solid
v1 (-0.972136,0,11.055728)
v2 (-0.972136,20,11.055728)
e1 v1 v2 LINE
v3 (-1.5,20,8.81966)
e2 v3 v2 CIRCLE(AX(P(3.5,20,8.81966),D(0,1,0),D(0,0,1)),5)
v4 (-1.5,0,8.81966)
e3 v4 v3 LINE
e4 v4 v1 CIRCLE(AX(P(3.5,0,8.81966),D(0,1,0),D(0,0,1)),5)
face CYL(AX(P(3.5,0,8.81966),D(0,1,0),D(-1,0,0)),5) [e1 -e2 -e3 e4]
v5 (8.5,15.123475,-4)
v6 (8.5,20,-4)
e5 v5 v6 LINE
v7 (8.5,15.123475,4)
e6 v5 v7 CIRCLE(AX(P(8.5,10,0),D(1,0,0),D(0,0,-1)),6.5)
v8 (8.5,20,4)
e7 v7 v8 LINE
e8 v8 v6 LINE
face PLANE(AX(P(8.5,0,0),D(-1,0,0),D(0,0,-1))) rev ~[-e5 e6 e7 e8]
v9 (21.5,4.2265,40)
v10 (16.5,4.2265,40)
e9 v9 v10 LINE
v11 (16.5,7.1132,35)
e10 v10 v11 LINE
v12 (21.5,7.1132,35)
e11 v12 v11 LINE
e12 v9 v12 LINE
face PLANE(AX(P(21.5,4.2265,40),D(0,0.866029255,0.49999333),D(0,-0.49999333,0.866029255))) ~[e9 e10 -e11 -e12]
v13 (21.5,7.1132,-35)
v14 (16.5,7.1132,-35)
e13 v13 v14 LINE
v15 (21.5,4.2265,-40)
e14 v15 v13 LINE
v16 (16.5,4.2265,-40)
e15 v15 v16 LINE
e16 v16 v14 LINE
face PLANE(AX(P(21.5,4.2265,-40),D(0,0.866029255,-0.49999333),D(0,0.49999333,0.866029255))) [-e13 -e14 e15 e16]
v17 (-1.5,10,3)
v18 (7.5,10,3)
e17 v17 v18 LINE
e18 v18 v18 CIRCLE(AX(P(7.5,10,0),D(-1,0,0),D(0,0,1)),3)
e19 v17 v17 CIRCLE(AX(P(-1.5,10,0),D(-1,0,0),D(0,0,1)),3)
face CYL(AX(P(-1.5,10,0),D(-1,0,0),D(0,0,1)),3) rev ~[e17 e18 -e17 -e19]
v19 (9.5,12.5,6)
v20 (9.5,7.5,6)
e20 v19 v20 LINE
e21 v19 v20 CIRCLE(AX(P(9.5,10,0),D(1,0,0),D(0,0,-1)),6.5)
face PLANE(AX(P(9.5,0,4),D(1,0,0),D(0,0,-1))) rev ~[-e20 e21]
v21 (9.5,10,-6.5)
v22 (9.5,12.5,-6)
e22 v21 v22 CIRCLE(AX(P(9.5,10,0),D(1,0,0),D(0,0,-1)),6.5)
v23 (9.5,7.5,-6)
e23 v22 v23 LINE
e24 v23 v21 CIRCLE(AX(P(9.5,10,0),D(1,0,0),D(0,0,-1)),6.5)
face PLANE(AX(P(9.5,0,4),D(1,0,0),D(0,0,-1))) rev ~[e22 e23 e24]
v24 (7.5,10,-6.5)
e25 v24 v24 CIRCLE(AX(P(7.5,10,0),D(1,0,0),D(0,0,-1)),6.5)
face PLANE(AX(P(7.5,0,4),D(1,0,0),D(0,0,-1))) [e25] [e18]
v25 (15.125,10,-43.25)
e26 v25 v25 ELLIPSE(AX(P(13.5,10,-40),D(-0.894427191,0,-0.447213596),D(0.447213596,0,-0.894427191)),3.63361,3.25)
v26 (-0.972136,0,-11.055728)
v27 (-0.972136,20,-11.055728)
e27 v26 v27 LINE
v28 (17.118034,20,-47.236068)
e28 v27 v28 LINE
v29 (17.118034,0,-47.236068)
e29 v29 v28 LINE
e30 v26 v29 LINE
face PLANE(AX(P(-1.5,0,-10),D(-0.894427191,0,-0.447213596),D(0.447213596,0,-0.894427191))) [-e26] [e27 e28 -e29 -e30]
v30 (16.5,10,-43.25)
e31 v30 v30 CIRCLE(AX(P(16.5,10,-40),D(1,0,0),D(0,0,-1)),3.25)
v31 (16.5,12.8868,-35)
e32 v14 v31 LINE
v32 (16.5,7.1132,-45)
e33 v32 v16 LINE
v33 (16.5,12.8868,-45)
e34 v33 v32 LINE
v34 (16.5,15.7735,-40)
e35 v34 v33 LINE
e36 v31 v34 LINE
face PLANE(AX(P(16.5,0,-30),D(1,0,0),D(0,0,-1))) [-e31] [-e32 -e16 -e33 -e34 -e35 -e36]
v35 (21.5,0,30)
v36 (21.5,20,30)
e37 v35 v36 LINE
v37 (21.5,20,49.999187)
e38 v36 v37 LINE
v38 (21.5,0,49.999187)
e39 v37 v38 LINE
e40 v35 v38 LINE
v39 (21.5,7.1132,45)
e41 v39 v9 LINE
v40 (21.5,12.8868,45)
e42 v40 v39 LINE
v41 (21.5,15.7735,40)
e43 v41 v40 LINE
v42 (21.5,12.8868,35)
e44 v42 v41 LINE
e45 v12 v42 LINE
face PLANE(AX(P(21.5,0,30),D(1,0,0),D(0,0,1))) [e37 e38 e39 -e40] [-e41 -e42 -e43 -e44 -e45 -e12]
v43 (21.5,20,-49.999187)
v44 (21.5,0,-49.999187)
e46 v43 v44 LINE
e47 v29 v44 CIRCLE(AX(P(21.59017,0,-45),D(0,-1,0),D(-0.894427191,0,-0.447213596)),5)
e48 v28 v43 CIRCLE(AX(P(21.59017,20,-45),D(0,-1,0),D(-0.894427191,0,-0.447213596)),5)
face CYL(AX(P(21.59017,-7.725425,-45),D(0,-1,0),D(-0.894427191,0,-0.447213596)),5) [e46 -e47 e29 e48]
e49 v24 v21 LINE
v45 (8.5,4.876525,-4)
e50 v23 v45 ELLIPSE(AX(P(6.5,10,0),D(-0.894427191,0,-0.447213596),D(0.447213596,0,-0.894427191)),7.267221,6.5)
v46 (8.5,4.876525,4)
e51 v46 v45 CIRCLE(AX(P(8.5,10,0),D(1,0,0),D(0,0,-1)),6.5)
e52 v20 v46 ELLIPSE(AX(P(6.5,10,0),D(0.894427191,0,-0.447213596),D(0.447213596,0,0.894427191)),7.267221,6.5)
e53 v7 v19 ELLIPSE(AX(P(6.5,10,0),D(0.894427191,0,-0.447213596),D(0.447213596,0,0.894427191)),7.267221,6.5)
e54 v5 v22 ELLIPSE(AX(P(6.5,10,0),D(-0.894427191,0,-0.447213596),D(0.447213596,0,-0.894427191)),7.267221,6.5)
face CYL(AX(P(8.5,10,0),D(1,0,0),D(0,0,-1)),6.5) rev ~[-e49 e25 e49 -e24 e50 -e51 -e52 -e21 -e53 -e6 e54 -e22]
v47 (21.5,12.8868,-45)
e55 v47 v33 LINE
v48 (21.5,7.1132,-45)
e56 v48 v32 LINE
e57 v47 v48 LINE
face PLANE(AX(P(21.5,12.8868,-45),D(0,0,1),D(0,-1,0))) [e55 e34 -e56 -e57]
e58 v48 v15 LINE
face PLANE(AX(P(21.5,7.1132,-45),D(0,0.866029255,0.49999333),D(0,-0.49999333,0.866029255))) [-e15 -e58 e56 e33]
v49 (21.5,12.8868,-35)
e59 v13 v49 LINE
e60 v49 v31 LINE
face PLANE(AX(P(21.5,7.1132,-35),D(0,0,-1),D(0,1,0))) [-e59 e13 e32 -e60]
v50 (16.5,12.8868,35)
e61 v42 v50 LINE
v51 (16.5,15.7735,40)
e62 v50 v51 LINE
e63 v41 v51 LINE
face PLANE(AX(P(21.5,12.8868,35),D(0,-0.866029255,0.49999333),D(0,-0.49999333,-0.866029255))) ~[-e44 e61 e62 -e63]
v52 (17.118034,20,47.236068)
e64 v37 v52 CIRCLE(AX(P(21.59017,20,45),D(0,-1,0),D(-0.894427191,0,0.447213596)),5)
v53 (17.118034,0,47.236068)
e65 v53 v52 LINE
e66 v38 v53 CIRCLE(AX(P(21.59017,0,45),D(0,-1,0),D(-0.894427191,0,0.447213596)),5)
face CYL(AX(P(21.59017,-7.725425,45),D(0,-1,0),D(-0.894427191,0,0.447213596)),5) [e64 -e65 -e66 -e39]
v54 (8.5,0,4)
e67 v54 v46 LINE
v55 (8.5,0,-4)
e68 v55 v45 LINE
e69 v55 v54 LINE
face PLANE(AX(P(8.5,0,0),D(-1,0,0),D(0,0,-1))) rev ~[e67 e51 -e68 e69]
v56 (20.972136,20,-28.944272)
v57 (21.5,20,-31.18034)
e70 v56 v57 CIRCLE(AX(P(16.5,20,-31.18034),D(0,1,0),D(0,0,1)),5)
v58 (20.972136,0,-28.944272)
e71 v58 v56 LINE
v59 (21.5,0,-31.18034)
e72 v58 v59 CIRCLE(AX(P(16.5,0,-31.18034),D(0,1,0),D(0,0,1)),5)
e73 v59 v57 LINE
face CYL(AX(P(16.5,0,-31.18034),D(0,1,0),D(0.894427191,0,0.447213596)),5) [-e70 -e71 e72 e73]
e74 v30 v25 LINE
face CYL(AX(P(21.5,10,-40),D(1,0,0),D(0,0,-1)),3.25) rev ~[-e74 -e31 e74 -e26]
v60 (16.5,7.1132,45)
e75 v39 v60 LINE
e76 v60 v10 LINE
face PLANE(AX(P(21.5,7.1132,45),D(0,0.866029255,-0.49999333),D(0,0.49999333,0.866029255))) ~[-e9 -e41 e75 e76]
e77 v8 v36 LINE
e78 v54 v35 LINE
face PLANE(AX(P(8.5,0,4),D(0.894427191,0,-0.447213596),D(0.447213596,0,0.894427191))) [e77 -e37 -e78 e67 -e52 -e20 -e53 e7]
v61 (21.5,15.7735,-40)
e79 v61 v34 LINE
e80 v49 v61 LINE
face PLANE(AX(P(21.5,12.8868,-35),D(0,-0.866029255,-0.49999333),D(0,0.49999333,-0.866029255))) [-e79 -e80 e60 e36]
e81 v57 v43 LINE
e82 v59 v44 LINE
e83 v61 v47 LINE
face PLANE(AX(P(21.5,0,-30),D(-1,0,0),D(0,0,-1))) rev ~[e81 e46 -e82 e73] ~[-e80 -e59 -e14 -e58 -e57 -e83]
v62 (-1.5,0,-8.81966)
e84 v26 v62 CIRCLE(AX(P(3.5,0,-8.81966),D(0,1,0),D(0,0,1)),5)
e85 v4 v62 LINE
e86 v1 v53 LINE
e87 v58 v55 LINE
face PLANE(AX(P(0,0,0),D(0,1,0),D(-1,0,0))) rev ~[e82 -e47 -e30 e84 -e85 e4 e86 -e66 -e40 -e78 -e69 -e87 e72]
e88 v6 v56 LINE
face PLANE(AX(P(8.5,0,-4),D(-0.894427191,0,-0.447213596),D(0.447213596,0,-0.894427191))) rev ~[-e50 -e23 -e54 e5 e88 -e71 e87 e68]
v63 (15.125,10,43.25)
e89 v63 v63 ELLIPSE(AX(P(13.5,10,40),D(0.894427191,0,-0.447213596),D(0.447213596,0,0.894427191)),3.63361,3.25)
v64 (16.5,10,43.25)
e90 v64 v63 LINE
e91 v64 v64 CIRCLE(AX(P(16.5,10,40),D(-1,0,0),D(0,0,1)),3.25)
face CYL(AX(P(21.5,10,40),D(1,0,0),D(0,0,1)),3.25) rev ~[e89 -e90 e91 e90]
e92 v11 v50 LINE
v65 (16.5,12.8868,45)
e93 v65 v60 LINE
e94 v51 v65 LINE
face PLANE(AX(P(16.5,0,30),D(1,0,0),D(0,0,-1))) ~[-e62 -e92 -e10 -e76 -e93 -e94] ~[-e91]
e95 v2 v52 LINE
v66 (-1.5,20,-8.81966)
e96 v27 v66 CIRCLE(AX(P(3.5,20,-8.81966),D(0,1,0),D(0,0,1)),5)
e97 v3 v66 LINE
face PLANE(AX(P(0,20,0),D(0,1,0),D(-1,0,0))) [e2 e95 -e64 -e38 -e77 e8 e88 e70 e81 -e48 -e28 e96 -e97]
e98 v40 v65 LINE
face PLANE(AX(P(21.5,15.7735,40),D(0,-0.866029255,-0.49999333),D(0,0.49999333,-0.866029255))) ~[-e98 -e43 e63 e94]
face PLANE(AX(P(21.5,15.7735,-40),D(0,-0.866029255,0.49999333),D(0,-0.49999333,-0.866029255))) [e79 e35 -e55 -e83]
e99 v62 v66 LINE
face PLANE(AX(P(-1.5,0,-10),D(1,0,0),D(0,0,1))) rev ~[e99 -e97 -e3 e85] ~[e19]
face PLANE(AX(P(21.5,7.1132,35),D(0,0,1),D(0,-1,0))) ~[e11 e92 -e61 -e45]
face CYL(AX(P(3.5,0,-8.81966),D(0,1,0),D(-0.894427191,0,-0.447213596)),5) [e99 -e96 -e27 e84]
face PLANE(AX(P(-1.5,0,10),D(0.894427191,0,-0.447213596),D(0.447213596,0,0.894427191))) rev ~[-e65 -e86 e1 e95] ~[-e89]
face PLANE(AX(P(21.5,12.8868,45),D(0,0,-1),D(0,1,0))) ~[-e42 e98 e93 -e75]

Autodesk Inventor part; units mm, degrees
ref_plane "YZ Plane" through (0, 0, 0) normal (1, 0, 0) x (0, 1, 0)
ref_plane "XZ Plane" through (0, 0, 0) normal (0, 1, 0) x (-1, 0, 0)
ref_plane "XY Plane" through (0, 0, 0) normal (0, 0, 1) x (1, 0, 0)
sketch "Sketch1" plane through (0, 0, 0) normal (0, 1, 0) x (-1, 0, 0)
  line L0 (0, 0) -> (-20, 0)
  line L1 (-20, 0) -> (-20, -40)
  line L2 (-20, -40) -> (0, 0)
  line L3 (-21.5, -50) -> (-18.5, -50)
  line L4 (-18.5, -50) -> (-18.5, -30)
  line L5 (-18.5, -30) -> (-21.5, -30)
  line L6 (-21.5, -30) -> (-21.5, -50)
  line L7 (-21.5, -50) -> (-18.5, -30) construction
  line L8 (-18.5, -50) -> (-21.5, -30) construction
  line L9 (1.5, 10) -> (-1.5, 10)
  line L10 (-1.5, 10) -> (-1.5, -10)
  line L11 (-1.5, -10) -> (1.5, -10)
  line L12 (1.5, -10) -> (1.5, 10)
  line L13 (1.5, 10) -> (-1.5, -10) construction
  line L14 (-1.5, 10) -> (1.5, -10) construction
  line L15 (-1.5, 10) -> (-21.5, -30)
  line L16 (1.5, -10) -> (-18.5, -50)
  line L17 (1.5, -10) -> (1.5, 10)
  line L18 (1.5, -10) -> (1.5, 10)
  line L19 (1.5, 10) -> (-8.5, 10)
  line L20 (-8.5, 10) -> (-8.5, -10)
  line L21 (-8.5, -10) -> (1.5, -10)
  line L22 (1.5, -10) -> (1.5, 10)
  line L23 (0, 0) -> (10, 0)
  line L24 (0, 0) -> (10, 0) construction
  line L25 (-20, 40) -> (0, 0)
  line L26 (-21.5, 50) -> (-18.5, 50)
  line L27 (-18.5, 50) -> (-18.5, 30)
  line L28 (-18.5, 30) -> (-21.5, 30)
  line L29 (-21.5, 30) -> (-21.5, 50)
  line L30 (-1.5, -10) -> (-1.5, 10)
  line L31 (-1.5, 10) -> (1.5, 10)
  line L32 (-1.5, -10) -> (-21.5, 30)
  line L33 (1.5, 10) -> (-18.5, 50)
  line L34 (1.5, 10) -> (1.5, -10)
  point P0 (-7.3579, -1.7157)
  point P1 (-11.5, -10)
  point P2 (-11.5, -10)
  point P3 (-8.5, -4)
  point P4 (-8.5, 4)
  dimension "d0" = 20
  dimension "d1" = 40
  dimension "d2" = 3
  dimension "d3" = 20
  dimension "d4" = 3
  dimension "d5" = 20
  dimension "d31" = 10
  dimension "d32" = 20
  dimension "d42" = 10
  dimension "d43" = 0
extrude "Extrusion1" add sketch "Sketch1" along normal blind 20 contours L2 L10 L0 | L23 L12 L11 L10 L2 | L25 L10 L9 L12 L23 | L0 L10 L25 | L10 L2 L32 L0 | L0 L15 L25 L10 | L10 L32 L2 | L25 L15 L10 | L15 L20 L0 | L32 L20 L19 L25 L15 | L32 L2 L21 L20 L15 | L0 L20 L32 | L32 L21 L2 | L11 L16 L4 L2 L21 | L9 L19 L25 L27 L33 | L15 L25 L19 | L20 L21 L2 L4 L5 L1 L15 | L32 L28 L27 L25 L19 L20 | L3 L6 L5 L1 L2 L4 | L27 L28 L29 L26 | L1 L5 L15 | L2 L1 L5 L4
sketch "Sketch2" plane through (-1.5, 0, -10) normal (-1, 0, 0) x (0, 0, 1)
  circle A0 centre (10, 10) radius 3
  line L0 (0, 0) -> (20, 0) projected
  line L1 (20, 0) -> (20, 20) projected
  point P0 (10, 0)
  dimension "d8" = 6
  dimension "d9" = 10
  dimension "d44" = 10
sketch "Sketch3" plane through (21.5, 0, -30) normal (1, 0, 0) x (0, 0, -1)
  circle A0 centre (10, 10) radius 3.25
  line L0 (0, 20) -> (20, 20) projected
  line L1 (20, 0) -> (20, 20) projected
  point P0 (-30, 0)
  dimension "d11" = 6.5
  dimension "d12" = 10
  dimension "d13" = 10
extrude "Extrusion2" cut sketch "Sketch2" against normal through all
extrude "Extrusion3" cut sketch "Sketch3" against normal through all
sketch "Sketch4" plane through (21.5, 0, -30) normal (1, 0, 0) x (0, 0, -1)
  circle A0 centre (10, 10) radius 3.25 projected
  line L0 (10, 15.7735) -> (15, 12.8868)
  line L1 (15, 12.8868) -> (15, 7.1132)
  line L2 (15, 7.1132) -> (10, 4.2265)
  line L3 (10, 4.2265) -> (5, 7.1132)
  line L4 (5, 7.1132) -> (5, 12.8868)
  line L5 (5, 12.8868) -> (10, 15.7735)
  line L6 (20, 0) -> (20, 20) projected
  point P0 (-30, 0)
  point P1 (10, 10)
  dimension "d19" = 10
extrude "Extrusion4" cut sketch "Sketch4" against normal blind 5
fillet "Fillet2" radius 5 1 edges at (21.5, 10, -30)
mirror "Mirror1" about plane through (0, 0, 0) normal (0, 0, 1) of "Extrusion4", "Extrusion3"
sketch "Sketch7" plane through (8.5, 0, 4) normal (1, 0, 0) x (0, 0, -1)
  circle A0 centre (4, 10) radius 3 projected
  circle A1 centre (4, 10) radius 6.5
  point P0 (4, 0)
  dimension "d52" = 13
extrude "Extrusion6" cut sketch "Sketch7" along normal mid plane 2 contours A0 | A1
fillet "Fillet8" radius 5 2 edges at (-1.5, 10, 10) (-1.5, 10, -10)
fillet "Fillet9" radius 5 2 edges at (18.5, 10, 50) (18.5, 10, -50)
ref_plane "Work Plane1" through (0, 0, 0) normal (0, 0, 1) x (1, 0, 0)
properties part number "Bottom_Foot_Standoff" material "PET Plastic"
